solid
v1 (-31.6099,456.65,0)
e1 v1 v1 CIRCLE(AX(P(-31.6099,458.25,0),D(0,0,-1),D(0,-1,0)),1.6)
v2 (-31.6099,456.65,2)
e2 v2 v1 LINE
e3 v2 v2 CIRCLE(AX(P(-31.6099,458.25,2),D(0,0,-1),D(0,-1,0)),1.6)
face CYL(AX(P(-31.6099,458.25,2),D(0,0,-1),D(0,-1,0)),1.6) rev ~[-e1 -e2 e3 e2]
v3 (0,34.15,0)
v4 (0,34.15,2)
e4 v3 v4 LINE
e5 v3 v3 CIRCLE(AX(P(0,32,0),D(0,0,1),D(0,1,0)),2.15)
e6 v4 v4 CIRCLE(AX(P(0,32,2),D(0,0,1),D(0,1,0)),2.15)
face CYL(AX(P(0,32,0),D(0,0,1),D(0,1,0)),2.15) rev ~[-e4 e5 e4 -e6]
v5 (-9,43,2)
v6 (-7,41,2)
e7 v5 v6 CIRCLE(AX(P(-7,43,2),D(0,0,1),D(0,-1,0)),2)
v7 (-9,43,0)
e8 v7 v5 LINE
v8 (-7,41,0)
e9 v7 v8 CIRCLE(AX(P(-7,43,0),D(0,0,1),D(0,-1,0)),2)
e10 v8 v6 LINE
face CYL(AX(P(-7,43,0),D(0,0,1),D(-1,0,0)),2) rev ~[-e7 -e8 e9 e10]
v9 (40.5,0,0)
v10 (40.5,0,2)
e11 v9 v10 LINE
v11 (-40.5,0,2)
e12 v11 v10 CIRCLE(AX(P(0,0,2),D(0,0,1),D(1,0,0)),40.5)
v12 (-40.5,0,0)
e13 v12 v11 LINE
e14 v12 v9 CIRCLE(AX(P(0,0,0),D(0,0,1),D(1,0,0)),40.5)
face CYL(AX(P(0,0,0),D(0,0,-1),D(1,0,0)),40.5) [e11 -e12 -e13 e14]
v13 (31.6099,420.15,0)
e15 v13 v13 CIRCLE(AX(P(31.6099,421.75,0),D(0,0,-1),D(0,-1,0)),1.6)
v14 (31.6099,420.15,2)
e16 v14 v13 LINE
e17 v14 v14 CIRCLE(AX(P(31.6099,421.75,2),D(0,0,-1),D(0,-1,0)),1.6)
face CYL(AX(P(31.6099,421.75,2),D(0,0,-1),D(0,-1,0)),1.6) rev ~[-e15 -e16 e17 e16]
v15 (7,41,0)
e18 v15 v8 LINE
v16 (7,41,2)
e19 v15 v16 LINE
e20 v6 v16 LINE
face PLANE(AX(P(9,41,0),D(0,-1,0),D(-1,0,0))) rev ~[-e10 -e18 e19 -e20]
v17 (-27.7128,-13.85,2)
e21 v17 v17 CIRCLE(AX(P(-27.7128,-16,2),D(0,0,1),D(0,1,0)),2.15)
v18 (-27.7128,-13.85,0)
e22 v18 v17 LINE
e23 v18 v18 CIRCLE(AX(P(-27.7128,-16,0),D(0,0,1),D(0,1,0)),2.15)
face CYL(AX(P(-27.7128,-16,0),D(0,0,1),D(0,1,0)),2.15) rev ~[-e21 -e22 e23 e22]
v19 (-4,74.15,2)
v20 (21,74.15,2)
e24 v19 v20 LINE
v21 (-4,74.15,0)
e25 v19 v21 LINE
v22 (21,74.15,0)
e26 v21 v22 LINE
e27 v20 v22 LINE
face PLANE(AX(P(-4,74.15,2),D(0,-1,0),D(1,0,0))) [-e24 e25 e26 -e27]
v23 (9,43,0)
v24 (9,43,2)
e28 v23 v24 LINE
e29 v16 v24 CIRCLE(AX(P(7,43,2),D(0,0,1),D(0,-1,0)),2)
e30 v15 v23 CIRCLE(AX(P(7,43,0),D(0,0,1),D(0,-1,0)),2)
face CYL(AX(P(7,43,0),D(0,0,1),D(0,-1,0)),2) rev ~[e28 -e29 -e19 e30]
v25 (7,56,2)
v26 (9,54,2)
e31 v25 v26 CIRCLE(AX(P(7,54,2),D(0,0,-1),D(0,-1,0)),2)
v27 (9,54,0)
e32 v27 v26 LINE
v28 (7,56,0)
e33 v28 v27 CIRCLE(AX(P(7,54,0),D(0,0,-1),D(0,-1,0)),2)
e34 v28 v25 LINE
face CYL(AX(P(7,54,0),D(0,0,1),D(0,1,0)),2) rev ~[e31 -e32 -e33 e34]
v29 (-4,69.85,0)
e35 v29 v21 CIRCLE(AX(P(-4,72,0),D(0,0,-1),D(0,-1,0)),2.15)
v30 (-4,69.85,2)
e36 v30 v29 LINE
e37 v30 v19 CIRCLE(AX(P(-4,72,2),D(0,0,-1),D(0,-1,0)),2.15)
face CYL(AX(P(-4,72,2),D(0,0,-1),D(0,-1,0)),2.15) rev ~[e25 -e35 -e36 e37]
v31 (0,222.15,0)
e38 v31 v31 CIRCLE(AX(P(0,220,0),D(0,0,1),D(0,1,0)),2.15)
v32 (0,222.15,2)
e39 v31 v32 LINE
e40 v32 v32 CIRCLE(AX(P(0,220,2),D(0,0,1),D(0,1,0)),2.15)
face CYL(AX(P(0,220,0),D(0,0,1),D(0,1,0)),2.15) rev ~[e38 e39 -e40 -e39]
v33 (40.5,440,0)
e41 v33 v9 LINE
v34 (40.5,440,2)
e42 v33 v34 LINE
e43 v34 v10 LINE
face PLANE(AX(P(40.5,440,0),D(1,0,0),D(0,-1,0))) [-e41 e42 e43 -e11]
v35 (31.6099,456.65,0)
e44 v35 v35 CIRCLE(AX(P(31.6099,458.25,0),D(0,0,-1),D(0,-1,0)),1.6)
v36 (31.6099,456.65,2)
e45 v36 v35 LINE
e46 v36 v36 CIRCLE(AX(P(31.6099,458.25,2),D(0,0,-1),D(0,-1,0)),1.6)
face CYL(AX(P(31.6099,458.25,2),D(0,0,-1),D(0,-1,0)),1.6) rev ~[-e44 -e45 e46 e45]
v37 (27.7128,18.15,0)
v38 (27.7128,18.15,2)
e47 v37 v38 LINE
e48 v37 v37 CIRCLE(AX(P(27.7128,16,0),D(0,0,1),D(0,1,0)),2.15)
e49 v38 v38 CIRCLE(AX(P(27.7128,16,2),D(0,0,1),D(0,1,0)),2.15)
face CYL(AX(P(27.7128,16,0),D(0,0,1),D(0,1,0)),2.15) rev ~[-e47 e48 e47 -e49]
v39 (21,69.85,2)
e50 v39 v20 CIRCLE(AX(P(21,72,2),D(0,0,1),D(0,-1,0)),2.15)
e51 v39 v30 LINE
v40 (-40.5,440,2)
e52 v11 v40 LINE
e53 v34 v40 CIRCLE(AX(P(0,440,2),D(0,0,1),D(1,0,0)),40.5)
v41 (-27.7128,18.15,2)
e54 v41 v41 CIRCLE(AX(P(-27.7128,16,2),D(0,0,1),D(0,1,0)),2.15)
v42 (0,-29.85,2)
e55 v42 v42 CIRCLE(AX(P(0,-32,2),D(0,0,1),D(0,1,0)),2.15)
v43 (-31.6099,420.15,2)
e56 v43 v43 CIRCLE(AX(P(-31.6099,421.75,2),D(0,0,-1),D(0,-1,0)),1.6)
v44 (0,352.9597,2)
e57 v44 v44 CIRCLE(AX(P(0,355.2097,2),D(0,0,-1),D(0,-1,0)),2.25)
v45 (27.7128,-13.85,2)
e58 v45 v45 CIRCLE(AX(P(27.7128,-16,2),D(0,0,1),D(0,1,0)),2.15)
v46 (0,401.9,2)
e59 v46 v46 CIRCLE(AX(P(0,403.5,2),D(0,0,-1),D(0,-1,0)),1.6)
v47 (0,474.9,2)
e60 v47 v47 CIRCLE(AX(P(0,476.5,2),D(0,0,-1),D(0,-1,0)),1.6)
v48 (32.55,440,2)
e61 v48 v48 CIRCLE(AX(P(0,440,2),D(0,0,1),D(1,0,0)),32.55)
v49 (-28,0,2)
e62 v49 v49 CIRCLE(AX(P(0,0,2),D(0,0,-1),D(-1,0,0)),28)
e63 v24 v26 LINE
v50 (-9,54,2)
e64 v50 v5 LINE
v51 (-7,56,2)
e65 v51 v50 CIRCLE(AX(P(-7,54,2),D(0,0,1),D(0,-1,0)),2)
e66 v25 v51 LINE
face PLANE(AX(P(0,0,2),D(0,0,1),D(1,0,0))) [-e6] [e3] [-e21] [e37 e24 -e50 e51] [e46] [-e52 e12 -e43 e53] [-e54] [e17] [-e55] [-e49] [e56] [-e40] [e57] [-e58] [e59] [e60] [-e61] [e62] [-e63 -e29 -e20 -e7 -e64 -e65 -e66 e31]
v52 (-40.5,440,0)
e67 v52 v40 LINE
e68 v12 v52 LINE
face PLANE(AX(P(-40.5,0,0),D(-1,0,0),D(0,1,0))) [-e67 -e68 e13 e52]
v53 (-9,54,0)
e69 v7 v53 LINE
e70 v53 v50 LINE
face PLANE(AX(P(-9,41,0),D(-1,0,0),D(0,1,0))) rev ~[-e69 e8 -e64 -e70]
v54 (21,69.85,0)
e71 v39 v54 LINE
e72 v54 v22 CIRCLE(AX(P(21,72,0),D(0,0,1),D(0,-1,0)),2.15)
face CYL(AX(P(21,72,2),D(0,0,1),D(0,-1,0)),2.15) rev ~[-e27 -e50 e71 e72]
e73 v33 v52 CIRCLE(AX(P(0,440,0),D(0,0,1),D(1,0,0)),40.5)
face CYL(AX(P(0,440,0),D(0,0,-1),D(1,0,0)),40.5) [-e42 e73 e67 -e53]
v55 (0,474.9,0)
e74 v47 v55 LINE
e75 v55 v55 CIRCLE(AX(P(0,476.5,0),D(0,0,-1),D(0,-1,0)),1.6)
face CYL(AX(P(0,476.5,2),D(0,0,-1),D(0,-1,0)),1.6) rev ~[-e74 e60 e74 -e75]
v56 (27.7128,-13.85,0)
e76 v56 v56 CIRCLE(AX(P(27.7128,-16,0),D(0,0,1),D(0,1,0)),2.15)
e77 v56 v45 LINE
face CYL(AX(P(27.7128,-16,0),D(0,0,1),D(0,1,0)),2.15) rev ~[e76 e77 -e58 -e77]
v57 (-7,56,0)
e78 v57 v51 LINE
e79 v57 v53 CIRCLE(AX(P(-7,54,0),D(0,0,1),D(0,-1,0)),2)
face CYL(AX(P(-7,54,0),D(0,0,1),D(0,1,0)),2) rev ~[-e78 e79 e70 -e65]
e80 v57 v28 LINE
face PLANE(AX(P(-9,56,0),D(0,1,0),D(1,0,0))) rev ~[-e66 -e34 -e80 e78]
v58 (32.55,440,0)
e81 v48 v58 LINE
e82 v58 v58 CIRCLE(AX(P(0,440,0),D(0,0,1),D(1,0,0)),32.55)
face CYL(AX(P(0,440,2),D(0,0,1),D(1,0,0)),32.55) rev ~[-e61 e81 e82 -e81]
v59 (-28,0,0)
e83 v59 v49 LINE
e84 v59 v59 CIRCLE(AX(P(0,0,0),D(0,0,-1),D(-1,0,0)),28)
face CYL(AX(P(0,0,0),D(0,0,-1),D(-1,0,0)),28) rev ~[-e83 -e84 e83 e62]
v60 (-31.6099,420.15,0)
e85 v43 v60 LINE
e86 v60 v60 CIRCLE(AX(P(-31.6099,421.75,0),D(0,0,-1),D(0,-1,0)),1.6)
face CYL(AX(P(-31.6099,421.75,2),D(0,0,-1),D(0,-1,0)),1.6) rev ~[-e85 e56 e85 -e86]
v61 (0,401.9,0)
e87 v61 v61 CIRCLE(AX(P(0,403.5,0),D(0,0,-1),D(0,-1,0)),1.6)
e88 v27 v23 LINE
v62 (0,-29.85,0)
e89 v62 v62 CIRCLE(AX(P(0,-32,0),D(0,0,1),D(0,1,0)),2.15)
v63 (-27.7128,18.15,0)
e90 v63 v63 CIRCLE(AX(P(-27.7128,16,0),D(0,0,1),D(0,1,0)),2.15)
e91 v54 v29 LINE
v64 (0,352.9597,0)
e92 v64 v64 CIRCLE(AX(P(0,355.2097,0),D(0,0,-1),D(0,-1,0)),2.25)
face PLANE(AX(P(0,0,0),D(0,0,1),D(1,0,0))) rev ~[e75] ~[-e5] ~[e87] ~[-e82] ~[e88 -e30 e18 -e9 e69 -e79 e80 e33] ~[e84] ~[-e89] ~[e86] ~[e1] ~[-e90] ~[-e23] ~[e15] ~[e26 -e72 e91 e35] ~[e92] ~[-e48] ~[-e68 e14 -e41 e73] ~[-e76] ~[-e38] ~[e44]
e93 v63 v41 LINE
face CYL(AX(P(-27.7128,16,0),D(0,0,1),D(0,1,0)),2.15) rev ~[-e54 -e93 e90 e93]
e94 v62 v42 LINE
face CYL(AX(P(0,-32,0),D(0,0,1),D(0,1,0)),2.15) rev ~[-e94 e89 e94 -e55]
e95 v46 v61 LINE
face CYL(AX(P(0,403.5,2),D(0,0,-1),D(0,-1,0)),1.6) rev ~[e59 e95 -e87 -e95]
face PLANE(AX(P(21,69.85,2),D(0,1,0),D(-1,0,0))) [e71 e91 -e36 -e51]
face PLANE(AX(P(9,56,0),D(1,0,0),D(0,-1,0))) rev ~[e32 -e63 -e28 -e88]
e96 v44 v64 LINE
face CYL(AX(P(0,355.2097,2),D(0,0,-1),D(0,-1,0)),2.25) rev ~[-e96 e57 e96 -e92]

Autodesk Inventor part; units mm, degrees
ref_plane "YZ Plane" through (0, 0, 0) normal (1, 0, 0) x (0, 1, 0)
ref_plane "XZ Plane" through (0, 0, 0) normal (0, 1, 0) x (-1, 0, 0)
ref_plane "XY Plane" through (0, 0, 0) normal (0, 0, 1) x (1, 0, 0)
sketch "スケッチ1" plane through (0, 0, 0) normal (0, 0, 1) x (1, 0, 0)
  circle A0 centre (0, 0) radius 40.5
  circle A1 centre (0, 440) radius 40.5
  line L0 (-40.5, 0) -> (-40.5, 440)
  line L1 (40.5, 440) -> (40.5, 0)
  dimension "d0" = 81
  dimension "d1" = 81
  dimension "d2" = 440
extrude "プレート1" add sketch "スケッチ1" along normal blind 2
sketch "スケッチ4" plane through (0, 0, 0) normal (0, 0, -1) x (-1, 0, 0)
  circle A0 centre (0, 0) radius 28
  dimension "d28" = 56
extrude "押し出し1" cut sketch "スケッチ4" against normal blind 10
sketch "スケッチ5" plane through (0, 0, 0) normal (0, 0, -1) x (-1, 0, 0)
  circle A0 centre (0, 0) radius 32
  point P0 (0, 32)
  point P1 (-27.7128, 16)
  point P2 (-27.7128, -16)
  point P3 (0, -32)
  point P4 (27.7128, -16)
  point P5 (27.7128, 16)
  dimension "d31" = 64
  dimension "d34" = 360
hole "穴3" at (0, 32, 0) at (27.7128, 16, 0) at (27.7128, -16, 0) at (0, -32, 0) at (-27.7128, -16, 0) at (-27.7128, 16, 0) direction (0, 0, 1) diameter 4.3 end through all clearance for "Flat Head Machine Screw" size "M4" standard "Ansi Metric M Profile"
sketch "スケッチ6" plane through (0, 0, 2) normal (0, 0, 1) x (1, 0, 0)
  arc A0 (40.5, 440) -> (-40.5, 440) centre (0, 440) ccw projected
  circle A1 centre (0, 440) radius 32.55
  point P0 (0, 0)
  dimension "d43" = 65.1
extrude "押し出し2" cut sketch "スケッチ6" against normal blind 10
sketch "スケッチ9" plane through (0, 0, 2) normal (0, 0, 1) x (1, 0, 0)
  arc A0 (40.5, 440) -> (-40.5, 440) centre (0, 440) ccw projected
  circle A1 centre (0, 440) radius 36.5
  point P0 (0, 0)
  point P1 (0, 476.5)
  point P2 (-31.6099, 458.25)
  point P3 (-31.6099, 421.75)
  point P4 (0, 403.5)
  point P5 (31.6099, 421.75)
  point P6 (31.6099, 458.25)
  dimension "d58" = 73
  dimension "d61" = 360
hole "穴5" at (0, 476.5, 2) at (-31.6099, 458.25, 2) at (-31.6099, 421.75, 2) at (0, 403.5, 2) at (31.6099, 421.75, 2) at (31.6099, 458.25, 2) direction (0, 0, -1) diameter 3.2 end through all clearance for "Socket Head Cap Screw" size "M3" standard "Ansi Metric M Profile"
sketch "スケッチ16" plane through (0, 0, 2) normal (0, 0, 1) x (1, 0, 0)
  circle A0 centre (0, 355.2097) radius 4
  arc A1 (40.5, 440) -> (-40.5, 440) centre (0, 440) ccw projected
  circle A2 centre (0, 440) radius 25
  line L0 (-23.4923, 431.4495) -> (4.1883, 355.3977)
  line L1 (0, 603.9) -> (0, -147.9) projected
  point P0 (0, 0)
  dimension "d154" = 50
  dimension "d135" = 8
  dimension "d136" = 0
  dimension "d137" = 160
hole "穴11" at (0, 355.2097, 2) direction (0, 0, -1) diameter 4.5 end through all clearance for "Flat Head Machine Screw" size "M4" standard "Ansi Metric M Profile"
sketch "スケッチ17" plane through (0, 0, 2) normal (0, 0, 1) x (1, 0, 0)
  circle A0 centre (0, 0) radius 44
  point P0 (-4, 72)
  dimension "d145" = 88
  dimension "d177" = 72
  dimension "d178" = 4
hole "穴12" at (-4, 72, 2) direction (0, 0, -1) diameter 4.3 end through all clearance for "Flat Head Machine Screw" size "M4" standard "Ansi Metric M Profile"
sketch "スケッチ18" plane through (0, 0, 0) normal (0, 0, -1) x (-1, 0, 0)
  line L0 (-9, 41) -> (9, 41)
  line L1 (9, 41) -> (9, 56)
  line L2 (9, 56) -> (-9, 56)
  line L3 (-9, 56) -> (-9, 41)
  line L4 (-9, 41) -> (9, 56) construction
  line L5 (9, 41) -> (-9, 56) construction
  arc A0 (40.5, 440) -> (-40.5, 440) centre (0, 440) ccw projected
  point P0 (0, 0)
  point P1 (0, 48.5)
  point P2 (0, 48.5)
  dimension "d157" = 18
  dimension "d158" = 15
  dimension "d183" = 41
extrude "押し出し4" cut sketch "スケッチ18" against normal blind 10
fillet "コーナーR2" radius 2 4 edges at (-9, 56, 1) (9, 56, 1) (9, 41, 1) (-9, 41, 1)
sketch "スケッチ19" plane through (0, 0, 2) normal (0, 0, 1) x (1, 0, 0)
  line L0 (21, 72) -> (-4, 72) construction
  line L1 (21, 69.85) -> (-4, 69.85)
  line L2 (-4, 74.15) -> (21, 74.15)
  arc A0 (21, 69.85) -> (21, 74.15) centre (21, 72) ccw
  arc A1 (-4, 74.15) -> (-4, 69.85) centre (-4, 72) ccw
  circle A2 centre (-4, 72) radius 2.15 projected
  point P0 (0, 0)
  point P1 (8.5, 72)
  dimension "d182" = 21
extrude "押し出し5" cut sketch "スケッチ19" against normal blind 10
sketch "スケッチ20" plane through (0, 0, 0) normal (0, 0, -1) x (-1, 0, 0)
  point P0 (0, 0)
  point P1 (0, 220)
  dimension "d167" = 220
hole "穴13" at (0, 220, 0) direction (0, 0, 1) diameter 4.3 end through all clearance for "Flat Head Machine Screw" size "M4" standard "Ansi Metric M Profile"
equation "\"d41\" = Thickness"
equation "\"d68\" = Thickness"
equation "\"d143\" = Thickness"
equation "\"d152\" = Thickness"
equation "\"d173\" = Thickness"
equation "\"d3\" = Thickness"
equation "\"BendRadius\" = Thickness"
equation "\"BendReliefWidth\" = Thickness"
equation "\"BendReliefDepth\" = 0.5 * Thickness"
equation "\"CornerReliefSize\" = 4 * Thickness"
equation "\"MinimumRemnant\" = 2 * Thickness"
equation "\"TransitionRadius\" = BendRadius"
equation "\"JacobiRadiusSize\" = Thickness"
equation "\"GapSize\" = Thickness"
equation "\"Thickness\" = 2"
properties part number "link2-plate2" material "CFRP"
